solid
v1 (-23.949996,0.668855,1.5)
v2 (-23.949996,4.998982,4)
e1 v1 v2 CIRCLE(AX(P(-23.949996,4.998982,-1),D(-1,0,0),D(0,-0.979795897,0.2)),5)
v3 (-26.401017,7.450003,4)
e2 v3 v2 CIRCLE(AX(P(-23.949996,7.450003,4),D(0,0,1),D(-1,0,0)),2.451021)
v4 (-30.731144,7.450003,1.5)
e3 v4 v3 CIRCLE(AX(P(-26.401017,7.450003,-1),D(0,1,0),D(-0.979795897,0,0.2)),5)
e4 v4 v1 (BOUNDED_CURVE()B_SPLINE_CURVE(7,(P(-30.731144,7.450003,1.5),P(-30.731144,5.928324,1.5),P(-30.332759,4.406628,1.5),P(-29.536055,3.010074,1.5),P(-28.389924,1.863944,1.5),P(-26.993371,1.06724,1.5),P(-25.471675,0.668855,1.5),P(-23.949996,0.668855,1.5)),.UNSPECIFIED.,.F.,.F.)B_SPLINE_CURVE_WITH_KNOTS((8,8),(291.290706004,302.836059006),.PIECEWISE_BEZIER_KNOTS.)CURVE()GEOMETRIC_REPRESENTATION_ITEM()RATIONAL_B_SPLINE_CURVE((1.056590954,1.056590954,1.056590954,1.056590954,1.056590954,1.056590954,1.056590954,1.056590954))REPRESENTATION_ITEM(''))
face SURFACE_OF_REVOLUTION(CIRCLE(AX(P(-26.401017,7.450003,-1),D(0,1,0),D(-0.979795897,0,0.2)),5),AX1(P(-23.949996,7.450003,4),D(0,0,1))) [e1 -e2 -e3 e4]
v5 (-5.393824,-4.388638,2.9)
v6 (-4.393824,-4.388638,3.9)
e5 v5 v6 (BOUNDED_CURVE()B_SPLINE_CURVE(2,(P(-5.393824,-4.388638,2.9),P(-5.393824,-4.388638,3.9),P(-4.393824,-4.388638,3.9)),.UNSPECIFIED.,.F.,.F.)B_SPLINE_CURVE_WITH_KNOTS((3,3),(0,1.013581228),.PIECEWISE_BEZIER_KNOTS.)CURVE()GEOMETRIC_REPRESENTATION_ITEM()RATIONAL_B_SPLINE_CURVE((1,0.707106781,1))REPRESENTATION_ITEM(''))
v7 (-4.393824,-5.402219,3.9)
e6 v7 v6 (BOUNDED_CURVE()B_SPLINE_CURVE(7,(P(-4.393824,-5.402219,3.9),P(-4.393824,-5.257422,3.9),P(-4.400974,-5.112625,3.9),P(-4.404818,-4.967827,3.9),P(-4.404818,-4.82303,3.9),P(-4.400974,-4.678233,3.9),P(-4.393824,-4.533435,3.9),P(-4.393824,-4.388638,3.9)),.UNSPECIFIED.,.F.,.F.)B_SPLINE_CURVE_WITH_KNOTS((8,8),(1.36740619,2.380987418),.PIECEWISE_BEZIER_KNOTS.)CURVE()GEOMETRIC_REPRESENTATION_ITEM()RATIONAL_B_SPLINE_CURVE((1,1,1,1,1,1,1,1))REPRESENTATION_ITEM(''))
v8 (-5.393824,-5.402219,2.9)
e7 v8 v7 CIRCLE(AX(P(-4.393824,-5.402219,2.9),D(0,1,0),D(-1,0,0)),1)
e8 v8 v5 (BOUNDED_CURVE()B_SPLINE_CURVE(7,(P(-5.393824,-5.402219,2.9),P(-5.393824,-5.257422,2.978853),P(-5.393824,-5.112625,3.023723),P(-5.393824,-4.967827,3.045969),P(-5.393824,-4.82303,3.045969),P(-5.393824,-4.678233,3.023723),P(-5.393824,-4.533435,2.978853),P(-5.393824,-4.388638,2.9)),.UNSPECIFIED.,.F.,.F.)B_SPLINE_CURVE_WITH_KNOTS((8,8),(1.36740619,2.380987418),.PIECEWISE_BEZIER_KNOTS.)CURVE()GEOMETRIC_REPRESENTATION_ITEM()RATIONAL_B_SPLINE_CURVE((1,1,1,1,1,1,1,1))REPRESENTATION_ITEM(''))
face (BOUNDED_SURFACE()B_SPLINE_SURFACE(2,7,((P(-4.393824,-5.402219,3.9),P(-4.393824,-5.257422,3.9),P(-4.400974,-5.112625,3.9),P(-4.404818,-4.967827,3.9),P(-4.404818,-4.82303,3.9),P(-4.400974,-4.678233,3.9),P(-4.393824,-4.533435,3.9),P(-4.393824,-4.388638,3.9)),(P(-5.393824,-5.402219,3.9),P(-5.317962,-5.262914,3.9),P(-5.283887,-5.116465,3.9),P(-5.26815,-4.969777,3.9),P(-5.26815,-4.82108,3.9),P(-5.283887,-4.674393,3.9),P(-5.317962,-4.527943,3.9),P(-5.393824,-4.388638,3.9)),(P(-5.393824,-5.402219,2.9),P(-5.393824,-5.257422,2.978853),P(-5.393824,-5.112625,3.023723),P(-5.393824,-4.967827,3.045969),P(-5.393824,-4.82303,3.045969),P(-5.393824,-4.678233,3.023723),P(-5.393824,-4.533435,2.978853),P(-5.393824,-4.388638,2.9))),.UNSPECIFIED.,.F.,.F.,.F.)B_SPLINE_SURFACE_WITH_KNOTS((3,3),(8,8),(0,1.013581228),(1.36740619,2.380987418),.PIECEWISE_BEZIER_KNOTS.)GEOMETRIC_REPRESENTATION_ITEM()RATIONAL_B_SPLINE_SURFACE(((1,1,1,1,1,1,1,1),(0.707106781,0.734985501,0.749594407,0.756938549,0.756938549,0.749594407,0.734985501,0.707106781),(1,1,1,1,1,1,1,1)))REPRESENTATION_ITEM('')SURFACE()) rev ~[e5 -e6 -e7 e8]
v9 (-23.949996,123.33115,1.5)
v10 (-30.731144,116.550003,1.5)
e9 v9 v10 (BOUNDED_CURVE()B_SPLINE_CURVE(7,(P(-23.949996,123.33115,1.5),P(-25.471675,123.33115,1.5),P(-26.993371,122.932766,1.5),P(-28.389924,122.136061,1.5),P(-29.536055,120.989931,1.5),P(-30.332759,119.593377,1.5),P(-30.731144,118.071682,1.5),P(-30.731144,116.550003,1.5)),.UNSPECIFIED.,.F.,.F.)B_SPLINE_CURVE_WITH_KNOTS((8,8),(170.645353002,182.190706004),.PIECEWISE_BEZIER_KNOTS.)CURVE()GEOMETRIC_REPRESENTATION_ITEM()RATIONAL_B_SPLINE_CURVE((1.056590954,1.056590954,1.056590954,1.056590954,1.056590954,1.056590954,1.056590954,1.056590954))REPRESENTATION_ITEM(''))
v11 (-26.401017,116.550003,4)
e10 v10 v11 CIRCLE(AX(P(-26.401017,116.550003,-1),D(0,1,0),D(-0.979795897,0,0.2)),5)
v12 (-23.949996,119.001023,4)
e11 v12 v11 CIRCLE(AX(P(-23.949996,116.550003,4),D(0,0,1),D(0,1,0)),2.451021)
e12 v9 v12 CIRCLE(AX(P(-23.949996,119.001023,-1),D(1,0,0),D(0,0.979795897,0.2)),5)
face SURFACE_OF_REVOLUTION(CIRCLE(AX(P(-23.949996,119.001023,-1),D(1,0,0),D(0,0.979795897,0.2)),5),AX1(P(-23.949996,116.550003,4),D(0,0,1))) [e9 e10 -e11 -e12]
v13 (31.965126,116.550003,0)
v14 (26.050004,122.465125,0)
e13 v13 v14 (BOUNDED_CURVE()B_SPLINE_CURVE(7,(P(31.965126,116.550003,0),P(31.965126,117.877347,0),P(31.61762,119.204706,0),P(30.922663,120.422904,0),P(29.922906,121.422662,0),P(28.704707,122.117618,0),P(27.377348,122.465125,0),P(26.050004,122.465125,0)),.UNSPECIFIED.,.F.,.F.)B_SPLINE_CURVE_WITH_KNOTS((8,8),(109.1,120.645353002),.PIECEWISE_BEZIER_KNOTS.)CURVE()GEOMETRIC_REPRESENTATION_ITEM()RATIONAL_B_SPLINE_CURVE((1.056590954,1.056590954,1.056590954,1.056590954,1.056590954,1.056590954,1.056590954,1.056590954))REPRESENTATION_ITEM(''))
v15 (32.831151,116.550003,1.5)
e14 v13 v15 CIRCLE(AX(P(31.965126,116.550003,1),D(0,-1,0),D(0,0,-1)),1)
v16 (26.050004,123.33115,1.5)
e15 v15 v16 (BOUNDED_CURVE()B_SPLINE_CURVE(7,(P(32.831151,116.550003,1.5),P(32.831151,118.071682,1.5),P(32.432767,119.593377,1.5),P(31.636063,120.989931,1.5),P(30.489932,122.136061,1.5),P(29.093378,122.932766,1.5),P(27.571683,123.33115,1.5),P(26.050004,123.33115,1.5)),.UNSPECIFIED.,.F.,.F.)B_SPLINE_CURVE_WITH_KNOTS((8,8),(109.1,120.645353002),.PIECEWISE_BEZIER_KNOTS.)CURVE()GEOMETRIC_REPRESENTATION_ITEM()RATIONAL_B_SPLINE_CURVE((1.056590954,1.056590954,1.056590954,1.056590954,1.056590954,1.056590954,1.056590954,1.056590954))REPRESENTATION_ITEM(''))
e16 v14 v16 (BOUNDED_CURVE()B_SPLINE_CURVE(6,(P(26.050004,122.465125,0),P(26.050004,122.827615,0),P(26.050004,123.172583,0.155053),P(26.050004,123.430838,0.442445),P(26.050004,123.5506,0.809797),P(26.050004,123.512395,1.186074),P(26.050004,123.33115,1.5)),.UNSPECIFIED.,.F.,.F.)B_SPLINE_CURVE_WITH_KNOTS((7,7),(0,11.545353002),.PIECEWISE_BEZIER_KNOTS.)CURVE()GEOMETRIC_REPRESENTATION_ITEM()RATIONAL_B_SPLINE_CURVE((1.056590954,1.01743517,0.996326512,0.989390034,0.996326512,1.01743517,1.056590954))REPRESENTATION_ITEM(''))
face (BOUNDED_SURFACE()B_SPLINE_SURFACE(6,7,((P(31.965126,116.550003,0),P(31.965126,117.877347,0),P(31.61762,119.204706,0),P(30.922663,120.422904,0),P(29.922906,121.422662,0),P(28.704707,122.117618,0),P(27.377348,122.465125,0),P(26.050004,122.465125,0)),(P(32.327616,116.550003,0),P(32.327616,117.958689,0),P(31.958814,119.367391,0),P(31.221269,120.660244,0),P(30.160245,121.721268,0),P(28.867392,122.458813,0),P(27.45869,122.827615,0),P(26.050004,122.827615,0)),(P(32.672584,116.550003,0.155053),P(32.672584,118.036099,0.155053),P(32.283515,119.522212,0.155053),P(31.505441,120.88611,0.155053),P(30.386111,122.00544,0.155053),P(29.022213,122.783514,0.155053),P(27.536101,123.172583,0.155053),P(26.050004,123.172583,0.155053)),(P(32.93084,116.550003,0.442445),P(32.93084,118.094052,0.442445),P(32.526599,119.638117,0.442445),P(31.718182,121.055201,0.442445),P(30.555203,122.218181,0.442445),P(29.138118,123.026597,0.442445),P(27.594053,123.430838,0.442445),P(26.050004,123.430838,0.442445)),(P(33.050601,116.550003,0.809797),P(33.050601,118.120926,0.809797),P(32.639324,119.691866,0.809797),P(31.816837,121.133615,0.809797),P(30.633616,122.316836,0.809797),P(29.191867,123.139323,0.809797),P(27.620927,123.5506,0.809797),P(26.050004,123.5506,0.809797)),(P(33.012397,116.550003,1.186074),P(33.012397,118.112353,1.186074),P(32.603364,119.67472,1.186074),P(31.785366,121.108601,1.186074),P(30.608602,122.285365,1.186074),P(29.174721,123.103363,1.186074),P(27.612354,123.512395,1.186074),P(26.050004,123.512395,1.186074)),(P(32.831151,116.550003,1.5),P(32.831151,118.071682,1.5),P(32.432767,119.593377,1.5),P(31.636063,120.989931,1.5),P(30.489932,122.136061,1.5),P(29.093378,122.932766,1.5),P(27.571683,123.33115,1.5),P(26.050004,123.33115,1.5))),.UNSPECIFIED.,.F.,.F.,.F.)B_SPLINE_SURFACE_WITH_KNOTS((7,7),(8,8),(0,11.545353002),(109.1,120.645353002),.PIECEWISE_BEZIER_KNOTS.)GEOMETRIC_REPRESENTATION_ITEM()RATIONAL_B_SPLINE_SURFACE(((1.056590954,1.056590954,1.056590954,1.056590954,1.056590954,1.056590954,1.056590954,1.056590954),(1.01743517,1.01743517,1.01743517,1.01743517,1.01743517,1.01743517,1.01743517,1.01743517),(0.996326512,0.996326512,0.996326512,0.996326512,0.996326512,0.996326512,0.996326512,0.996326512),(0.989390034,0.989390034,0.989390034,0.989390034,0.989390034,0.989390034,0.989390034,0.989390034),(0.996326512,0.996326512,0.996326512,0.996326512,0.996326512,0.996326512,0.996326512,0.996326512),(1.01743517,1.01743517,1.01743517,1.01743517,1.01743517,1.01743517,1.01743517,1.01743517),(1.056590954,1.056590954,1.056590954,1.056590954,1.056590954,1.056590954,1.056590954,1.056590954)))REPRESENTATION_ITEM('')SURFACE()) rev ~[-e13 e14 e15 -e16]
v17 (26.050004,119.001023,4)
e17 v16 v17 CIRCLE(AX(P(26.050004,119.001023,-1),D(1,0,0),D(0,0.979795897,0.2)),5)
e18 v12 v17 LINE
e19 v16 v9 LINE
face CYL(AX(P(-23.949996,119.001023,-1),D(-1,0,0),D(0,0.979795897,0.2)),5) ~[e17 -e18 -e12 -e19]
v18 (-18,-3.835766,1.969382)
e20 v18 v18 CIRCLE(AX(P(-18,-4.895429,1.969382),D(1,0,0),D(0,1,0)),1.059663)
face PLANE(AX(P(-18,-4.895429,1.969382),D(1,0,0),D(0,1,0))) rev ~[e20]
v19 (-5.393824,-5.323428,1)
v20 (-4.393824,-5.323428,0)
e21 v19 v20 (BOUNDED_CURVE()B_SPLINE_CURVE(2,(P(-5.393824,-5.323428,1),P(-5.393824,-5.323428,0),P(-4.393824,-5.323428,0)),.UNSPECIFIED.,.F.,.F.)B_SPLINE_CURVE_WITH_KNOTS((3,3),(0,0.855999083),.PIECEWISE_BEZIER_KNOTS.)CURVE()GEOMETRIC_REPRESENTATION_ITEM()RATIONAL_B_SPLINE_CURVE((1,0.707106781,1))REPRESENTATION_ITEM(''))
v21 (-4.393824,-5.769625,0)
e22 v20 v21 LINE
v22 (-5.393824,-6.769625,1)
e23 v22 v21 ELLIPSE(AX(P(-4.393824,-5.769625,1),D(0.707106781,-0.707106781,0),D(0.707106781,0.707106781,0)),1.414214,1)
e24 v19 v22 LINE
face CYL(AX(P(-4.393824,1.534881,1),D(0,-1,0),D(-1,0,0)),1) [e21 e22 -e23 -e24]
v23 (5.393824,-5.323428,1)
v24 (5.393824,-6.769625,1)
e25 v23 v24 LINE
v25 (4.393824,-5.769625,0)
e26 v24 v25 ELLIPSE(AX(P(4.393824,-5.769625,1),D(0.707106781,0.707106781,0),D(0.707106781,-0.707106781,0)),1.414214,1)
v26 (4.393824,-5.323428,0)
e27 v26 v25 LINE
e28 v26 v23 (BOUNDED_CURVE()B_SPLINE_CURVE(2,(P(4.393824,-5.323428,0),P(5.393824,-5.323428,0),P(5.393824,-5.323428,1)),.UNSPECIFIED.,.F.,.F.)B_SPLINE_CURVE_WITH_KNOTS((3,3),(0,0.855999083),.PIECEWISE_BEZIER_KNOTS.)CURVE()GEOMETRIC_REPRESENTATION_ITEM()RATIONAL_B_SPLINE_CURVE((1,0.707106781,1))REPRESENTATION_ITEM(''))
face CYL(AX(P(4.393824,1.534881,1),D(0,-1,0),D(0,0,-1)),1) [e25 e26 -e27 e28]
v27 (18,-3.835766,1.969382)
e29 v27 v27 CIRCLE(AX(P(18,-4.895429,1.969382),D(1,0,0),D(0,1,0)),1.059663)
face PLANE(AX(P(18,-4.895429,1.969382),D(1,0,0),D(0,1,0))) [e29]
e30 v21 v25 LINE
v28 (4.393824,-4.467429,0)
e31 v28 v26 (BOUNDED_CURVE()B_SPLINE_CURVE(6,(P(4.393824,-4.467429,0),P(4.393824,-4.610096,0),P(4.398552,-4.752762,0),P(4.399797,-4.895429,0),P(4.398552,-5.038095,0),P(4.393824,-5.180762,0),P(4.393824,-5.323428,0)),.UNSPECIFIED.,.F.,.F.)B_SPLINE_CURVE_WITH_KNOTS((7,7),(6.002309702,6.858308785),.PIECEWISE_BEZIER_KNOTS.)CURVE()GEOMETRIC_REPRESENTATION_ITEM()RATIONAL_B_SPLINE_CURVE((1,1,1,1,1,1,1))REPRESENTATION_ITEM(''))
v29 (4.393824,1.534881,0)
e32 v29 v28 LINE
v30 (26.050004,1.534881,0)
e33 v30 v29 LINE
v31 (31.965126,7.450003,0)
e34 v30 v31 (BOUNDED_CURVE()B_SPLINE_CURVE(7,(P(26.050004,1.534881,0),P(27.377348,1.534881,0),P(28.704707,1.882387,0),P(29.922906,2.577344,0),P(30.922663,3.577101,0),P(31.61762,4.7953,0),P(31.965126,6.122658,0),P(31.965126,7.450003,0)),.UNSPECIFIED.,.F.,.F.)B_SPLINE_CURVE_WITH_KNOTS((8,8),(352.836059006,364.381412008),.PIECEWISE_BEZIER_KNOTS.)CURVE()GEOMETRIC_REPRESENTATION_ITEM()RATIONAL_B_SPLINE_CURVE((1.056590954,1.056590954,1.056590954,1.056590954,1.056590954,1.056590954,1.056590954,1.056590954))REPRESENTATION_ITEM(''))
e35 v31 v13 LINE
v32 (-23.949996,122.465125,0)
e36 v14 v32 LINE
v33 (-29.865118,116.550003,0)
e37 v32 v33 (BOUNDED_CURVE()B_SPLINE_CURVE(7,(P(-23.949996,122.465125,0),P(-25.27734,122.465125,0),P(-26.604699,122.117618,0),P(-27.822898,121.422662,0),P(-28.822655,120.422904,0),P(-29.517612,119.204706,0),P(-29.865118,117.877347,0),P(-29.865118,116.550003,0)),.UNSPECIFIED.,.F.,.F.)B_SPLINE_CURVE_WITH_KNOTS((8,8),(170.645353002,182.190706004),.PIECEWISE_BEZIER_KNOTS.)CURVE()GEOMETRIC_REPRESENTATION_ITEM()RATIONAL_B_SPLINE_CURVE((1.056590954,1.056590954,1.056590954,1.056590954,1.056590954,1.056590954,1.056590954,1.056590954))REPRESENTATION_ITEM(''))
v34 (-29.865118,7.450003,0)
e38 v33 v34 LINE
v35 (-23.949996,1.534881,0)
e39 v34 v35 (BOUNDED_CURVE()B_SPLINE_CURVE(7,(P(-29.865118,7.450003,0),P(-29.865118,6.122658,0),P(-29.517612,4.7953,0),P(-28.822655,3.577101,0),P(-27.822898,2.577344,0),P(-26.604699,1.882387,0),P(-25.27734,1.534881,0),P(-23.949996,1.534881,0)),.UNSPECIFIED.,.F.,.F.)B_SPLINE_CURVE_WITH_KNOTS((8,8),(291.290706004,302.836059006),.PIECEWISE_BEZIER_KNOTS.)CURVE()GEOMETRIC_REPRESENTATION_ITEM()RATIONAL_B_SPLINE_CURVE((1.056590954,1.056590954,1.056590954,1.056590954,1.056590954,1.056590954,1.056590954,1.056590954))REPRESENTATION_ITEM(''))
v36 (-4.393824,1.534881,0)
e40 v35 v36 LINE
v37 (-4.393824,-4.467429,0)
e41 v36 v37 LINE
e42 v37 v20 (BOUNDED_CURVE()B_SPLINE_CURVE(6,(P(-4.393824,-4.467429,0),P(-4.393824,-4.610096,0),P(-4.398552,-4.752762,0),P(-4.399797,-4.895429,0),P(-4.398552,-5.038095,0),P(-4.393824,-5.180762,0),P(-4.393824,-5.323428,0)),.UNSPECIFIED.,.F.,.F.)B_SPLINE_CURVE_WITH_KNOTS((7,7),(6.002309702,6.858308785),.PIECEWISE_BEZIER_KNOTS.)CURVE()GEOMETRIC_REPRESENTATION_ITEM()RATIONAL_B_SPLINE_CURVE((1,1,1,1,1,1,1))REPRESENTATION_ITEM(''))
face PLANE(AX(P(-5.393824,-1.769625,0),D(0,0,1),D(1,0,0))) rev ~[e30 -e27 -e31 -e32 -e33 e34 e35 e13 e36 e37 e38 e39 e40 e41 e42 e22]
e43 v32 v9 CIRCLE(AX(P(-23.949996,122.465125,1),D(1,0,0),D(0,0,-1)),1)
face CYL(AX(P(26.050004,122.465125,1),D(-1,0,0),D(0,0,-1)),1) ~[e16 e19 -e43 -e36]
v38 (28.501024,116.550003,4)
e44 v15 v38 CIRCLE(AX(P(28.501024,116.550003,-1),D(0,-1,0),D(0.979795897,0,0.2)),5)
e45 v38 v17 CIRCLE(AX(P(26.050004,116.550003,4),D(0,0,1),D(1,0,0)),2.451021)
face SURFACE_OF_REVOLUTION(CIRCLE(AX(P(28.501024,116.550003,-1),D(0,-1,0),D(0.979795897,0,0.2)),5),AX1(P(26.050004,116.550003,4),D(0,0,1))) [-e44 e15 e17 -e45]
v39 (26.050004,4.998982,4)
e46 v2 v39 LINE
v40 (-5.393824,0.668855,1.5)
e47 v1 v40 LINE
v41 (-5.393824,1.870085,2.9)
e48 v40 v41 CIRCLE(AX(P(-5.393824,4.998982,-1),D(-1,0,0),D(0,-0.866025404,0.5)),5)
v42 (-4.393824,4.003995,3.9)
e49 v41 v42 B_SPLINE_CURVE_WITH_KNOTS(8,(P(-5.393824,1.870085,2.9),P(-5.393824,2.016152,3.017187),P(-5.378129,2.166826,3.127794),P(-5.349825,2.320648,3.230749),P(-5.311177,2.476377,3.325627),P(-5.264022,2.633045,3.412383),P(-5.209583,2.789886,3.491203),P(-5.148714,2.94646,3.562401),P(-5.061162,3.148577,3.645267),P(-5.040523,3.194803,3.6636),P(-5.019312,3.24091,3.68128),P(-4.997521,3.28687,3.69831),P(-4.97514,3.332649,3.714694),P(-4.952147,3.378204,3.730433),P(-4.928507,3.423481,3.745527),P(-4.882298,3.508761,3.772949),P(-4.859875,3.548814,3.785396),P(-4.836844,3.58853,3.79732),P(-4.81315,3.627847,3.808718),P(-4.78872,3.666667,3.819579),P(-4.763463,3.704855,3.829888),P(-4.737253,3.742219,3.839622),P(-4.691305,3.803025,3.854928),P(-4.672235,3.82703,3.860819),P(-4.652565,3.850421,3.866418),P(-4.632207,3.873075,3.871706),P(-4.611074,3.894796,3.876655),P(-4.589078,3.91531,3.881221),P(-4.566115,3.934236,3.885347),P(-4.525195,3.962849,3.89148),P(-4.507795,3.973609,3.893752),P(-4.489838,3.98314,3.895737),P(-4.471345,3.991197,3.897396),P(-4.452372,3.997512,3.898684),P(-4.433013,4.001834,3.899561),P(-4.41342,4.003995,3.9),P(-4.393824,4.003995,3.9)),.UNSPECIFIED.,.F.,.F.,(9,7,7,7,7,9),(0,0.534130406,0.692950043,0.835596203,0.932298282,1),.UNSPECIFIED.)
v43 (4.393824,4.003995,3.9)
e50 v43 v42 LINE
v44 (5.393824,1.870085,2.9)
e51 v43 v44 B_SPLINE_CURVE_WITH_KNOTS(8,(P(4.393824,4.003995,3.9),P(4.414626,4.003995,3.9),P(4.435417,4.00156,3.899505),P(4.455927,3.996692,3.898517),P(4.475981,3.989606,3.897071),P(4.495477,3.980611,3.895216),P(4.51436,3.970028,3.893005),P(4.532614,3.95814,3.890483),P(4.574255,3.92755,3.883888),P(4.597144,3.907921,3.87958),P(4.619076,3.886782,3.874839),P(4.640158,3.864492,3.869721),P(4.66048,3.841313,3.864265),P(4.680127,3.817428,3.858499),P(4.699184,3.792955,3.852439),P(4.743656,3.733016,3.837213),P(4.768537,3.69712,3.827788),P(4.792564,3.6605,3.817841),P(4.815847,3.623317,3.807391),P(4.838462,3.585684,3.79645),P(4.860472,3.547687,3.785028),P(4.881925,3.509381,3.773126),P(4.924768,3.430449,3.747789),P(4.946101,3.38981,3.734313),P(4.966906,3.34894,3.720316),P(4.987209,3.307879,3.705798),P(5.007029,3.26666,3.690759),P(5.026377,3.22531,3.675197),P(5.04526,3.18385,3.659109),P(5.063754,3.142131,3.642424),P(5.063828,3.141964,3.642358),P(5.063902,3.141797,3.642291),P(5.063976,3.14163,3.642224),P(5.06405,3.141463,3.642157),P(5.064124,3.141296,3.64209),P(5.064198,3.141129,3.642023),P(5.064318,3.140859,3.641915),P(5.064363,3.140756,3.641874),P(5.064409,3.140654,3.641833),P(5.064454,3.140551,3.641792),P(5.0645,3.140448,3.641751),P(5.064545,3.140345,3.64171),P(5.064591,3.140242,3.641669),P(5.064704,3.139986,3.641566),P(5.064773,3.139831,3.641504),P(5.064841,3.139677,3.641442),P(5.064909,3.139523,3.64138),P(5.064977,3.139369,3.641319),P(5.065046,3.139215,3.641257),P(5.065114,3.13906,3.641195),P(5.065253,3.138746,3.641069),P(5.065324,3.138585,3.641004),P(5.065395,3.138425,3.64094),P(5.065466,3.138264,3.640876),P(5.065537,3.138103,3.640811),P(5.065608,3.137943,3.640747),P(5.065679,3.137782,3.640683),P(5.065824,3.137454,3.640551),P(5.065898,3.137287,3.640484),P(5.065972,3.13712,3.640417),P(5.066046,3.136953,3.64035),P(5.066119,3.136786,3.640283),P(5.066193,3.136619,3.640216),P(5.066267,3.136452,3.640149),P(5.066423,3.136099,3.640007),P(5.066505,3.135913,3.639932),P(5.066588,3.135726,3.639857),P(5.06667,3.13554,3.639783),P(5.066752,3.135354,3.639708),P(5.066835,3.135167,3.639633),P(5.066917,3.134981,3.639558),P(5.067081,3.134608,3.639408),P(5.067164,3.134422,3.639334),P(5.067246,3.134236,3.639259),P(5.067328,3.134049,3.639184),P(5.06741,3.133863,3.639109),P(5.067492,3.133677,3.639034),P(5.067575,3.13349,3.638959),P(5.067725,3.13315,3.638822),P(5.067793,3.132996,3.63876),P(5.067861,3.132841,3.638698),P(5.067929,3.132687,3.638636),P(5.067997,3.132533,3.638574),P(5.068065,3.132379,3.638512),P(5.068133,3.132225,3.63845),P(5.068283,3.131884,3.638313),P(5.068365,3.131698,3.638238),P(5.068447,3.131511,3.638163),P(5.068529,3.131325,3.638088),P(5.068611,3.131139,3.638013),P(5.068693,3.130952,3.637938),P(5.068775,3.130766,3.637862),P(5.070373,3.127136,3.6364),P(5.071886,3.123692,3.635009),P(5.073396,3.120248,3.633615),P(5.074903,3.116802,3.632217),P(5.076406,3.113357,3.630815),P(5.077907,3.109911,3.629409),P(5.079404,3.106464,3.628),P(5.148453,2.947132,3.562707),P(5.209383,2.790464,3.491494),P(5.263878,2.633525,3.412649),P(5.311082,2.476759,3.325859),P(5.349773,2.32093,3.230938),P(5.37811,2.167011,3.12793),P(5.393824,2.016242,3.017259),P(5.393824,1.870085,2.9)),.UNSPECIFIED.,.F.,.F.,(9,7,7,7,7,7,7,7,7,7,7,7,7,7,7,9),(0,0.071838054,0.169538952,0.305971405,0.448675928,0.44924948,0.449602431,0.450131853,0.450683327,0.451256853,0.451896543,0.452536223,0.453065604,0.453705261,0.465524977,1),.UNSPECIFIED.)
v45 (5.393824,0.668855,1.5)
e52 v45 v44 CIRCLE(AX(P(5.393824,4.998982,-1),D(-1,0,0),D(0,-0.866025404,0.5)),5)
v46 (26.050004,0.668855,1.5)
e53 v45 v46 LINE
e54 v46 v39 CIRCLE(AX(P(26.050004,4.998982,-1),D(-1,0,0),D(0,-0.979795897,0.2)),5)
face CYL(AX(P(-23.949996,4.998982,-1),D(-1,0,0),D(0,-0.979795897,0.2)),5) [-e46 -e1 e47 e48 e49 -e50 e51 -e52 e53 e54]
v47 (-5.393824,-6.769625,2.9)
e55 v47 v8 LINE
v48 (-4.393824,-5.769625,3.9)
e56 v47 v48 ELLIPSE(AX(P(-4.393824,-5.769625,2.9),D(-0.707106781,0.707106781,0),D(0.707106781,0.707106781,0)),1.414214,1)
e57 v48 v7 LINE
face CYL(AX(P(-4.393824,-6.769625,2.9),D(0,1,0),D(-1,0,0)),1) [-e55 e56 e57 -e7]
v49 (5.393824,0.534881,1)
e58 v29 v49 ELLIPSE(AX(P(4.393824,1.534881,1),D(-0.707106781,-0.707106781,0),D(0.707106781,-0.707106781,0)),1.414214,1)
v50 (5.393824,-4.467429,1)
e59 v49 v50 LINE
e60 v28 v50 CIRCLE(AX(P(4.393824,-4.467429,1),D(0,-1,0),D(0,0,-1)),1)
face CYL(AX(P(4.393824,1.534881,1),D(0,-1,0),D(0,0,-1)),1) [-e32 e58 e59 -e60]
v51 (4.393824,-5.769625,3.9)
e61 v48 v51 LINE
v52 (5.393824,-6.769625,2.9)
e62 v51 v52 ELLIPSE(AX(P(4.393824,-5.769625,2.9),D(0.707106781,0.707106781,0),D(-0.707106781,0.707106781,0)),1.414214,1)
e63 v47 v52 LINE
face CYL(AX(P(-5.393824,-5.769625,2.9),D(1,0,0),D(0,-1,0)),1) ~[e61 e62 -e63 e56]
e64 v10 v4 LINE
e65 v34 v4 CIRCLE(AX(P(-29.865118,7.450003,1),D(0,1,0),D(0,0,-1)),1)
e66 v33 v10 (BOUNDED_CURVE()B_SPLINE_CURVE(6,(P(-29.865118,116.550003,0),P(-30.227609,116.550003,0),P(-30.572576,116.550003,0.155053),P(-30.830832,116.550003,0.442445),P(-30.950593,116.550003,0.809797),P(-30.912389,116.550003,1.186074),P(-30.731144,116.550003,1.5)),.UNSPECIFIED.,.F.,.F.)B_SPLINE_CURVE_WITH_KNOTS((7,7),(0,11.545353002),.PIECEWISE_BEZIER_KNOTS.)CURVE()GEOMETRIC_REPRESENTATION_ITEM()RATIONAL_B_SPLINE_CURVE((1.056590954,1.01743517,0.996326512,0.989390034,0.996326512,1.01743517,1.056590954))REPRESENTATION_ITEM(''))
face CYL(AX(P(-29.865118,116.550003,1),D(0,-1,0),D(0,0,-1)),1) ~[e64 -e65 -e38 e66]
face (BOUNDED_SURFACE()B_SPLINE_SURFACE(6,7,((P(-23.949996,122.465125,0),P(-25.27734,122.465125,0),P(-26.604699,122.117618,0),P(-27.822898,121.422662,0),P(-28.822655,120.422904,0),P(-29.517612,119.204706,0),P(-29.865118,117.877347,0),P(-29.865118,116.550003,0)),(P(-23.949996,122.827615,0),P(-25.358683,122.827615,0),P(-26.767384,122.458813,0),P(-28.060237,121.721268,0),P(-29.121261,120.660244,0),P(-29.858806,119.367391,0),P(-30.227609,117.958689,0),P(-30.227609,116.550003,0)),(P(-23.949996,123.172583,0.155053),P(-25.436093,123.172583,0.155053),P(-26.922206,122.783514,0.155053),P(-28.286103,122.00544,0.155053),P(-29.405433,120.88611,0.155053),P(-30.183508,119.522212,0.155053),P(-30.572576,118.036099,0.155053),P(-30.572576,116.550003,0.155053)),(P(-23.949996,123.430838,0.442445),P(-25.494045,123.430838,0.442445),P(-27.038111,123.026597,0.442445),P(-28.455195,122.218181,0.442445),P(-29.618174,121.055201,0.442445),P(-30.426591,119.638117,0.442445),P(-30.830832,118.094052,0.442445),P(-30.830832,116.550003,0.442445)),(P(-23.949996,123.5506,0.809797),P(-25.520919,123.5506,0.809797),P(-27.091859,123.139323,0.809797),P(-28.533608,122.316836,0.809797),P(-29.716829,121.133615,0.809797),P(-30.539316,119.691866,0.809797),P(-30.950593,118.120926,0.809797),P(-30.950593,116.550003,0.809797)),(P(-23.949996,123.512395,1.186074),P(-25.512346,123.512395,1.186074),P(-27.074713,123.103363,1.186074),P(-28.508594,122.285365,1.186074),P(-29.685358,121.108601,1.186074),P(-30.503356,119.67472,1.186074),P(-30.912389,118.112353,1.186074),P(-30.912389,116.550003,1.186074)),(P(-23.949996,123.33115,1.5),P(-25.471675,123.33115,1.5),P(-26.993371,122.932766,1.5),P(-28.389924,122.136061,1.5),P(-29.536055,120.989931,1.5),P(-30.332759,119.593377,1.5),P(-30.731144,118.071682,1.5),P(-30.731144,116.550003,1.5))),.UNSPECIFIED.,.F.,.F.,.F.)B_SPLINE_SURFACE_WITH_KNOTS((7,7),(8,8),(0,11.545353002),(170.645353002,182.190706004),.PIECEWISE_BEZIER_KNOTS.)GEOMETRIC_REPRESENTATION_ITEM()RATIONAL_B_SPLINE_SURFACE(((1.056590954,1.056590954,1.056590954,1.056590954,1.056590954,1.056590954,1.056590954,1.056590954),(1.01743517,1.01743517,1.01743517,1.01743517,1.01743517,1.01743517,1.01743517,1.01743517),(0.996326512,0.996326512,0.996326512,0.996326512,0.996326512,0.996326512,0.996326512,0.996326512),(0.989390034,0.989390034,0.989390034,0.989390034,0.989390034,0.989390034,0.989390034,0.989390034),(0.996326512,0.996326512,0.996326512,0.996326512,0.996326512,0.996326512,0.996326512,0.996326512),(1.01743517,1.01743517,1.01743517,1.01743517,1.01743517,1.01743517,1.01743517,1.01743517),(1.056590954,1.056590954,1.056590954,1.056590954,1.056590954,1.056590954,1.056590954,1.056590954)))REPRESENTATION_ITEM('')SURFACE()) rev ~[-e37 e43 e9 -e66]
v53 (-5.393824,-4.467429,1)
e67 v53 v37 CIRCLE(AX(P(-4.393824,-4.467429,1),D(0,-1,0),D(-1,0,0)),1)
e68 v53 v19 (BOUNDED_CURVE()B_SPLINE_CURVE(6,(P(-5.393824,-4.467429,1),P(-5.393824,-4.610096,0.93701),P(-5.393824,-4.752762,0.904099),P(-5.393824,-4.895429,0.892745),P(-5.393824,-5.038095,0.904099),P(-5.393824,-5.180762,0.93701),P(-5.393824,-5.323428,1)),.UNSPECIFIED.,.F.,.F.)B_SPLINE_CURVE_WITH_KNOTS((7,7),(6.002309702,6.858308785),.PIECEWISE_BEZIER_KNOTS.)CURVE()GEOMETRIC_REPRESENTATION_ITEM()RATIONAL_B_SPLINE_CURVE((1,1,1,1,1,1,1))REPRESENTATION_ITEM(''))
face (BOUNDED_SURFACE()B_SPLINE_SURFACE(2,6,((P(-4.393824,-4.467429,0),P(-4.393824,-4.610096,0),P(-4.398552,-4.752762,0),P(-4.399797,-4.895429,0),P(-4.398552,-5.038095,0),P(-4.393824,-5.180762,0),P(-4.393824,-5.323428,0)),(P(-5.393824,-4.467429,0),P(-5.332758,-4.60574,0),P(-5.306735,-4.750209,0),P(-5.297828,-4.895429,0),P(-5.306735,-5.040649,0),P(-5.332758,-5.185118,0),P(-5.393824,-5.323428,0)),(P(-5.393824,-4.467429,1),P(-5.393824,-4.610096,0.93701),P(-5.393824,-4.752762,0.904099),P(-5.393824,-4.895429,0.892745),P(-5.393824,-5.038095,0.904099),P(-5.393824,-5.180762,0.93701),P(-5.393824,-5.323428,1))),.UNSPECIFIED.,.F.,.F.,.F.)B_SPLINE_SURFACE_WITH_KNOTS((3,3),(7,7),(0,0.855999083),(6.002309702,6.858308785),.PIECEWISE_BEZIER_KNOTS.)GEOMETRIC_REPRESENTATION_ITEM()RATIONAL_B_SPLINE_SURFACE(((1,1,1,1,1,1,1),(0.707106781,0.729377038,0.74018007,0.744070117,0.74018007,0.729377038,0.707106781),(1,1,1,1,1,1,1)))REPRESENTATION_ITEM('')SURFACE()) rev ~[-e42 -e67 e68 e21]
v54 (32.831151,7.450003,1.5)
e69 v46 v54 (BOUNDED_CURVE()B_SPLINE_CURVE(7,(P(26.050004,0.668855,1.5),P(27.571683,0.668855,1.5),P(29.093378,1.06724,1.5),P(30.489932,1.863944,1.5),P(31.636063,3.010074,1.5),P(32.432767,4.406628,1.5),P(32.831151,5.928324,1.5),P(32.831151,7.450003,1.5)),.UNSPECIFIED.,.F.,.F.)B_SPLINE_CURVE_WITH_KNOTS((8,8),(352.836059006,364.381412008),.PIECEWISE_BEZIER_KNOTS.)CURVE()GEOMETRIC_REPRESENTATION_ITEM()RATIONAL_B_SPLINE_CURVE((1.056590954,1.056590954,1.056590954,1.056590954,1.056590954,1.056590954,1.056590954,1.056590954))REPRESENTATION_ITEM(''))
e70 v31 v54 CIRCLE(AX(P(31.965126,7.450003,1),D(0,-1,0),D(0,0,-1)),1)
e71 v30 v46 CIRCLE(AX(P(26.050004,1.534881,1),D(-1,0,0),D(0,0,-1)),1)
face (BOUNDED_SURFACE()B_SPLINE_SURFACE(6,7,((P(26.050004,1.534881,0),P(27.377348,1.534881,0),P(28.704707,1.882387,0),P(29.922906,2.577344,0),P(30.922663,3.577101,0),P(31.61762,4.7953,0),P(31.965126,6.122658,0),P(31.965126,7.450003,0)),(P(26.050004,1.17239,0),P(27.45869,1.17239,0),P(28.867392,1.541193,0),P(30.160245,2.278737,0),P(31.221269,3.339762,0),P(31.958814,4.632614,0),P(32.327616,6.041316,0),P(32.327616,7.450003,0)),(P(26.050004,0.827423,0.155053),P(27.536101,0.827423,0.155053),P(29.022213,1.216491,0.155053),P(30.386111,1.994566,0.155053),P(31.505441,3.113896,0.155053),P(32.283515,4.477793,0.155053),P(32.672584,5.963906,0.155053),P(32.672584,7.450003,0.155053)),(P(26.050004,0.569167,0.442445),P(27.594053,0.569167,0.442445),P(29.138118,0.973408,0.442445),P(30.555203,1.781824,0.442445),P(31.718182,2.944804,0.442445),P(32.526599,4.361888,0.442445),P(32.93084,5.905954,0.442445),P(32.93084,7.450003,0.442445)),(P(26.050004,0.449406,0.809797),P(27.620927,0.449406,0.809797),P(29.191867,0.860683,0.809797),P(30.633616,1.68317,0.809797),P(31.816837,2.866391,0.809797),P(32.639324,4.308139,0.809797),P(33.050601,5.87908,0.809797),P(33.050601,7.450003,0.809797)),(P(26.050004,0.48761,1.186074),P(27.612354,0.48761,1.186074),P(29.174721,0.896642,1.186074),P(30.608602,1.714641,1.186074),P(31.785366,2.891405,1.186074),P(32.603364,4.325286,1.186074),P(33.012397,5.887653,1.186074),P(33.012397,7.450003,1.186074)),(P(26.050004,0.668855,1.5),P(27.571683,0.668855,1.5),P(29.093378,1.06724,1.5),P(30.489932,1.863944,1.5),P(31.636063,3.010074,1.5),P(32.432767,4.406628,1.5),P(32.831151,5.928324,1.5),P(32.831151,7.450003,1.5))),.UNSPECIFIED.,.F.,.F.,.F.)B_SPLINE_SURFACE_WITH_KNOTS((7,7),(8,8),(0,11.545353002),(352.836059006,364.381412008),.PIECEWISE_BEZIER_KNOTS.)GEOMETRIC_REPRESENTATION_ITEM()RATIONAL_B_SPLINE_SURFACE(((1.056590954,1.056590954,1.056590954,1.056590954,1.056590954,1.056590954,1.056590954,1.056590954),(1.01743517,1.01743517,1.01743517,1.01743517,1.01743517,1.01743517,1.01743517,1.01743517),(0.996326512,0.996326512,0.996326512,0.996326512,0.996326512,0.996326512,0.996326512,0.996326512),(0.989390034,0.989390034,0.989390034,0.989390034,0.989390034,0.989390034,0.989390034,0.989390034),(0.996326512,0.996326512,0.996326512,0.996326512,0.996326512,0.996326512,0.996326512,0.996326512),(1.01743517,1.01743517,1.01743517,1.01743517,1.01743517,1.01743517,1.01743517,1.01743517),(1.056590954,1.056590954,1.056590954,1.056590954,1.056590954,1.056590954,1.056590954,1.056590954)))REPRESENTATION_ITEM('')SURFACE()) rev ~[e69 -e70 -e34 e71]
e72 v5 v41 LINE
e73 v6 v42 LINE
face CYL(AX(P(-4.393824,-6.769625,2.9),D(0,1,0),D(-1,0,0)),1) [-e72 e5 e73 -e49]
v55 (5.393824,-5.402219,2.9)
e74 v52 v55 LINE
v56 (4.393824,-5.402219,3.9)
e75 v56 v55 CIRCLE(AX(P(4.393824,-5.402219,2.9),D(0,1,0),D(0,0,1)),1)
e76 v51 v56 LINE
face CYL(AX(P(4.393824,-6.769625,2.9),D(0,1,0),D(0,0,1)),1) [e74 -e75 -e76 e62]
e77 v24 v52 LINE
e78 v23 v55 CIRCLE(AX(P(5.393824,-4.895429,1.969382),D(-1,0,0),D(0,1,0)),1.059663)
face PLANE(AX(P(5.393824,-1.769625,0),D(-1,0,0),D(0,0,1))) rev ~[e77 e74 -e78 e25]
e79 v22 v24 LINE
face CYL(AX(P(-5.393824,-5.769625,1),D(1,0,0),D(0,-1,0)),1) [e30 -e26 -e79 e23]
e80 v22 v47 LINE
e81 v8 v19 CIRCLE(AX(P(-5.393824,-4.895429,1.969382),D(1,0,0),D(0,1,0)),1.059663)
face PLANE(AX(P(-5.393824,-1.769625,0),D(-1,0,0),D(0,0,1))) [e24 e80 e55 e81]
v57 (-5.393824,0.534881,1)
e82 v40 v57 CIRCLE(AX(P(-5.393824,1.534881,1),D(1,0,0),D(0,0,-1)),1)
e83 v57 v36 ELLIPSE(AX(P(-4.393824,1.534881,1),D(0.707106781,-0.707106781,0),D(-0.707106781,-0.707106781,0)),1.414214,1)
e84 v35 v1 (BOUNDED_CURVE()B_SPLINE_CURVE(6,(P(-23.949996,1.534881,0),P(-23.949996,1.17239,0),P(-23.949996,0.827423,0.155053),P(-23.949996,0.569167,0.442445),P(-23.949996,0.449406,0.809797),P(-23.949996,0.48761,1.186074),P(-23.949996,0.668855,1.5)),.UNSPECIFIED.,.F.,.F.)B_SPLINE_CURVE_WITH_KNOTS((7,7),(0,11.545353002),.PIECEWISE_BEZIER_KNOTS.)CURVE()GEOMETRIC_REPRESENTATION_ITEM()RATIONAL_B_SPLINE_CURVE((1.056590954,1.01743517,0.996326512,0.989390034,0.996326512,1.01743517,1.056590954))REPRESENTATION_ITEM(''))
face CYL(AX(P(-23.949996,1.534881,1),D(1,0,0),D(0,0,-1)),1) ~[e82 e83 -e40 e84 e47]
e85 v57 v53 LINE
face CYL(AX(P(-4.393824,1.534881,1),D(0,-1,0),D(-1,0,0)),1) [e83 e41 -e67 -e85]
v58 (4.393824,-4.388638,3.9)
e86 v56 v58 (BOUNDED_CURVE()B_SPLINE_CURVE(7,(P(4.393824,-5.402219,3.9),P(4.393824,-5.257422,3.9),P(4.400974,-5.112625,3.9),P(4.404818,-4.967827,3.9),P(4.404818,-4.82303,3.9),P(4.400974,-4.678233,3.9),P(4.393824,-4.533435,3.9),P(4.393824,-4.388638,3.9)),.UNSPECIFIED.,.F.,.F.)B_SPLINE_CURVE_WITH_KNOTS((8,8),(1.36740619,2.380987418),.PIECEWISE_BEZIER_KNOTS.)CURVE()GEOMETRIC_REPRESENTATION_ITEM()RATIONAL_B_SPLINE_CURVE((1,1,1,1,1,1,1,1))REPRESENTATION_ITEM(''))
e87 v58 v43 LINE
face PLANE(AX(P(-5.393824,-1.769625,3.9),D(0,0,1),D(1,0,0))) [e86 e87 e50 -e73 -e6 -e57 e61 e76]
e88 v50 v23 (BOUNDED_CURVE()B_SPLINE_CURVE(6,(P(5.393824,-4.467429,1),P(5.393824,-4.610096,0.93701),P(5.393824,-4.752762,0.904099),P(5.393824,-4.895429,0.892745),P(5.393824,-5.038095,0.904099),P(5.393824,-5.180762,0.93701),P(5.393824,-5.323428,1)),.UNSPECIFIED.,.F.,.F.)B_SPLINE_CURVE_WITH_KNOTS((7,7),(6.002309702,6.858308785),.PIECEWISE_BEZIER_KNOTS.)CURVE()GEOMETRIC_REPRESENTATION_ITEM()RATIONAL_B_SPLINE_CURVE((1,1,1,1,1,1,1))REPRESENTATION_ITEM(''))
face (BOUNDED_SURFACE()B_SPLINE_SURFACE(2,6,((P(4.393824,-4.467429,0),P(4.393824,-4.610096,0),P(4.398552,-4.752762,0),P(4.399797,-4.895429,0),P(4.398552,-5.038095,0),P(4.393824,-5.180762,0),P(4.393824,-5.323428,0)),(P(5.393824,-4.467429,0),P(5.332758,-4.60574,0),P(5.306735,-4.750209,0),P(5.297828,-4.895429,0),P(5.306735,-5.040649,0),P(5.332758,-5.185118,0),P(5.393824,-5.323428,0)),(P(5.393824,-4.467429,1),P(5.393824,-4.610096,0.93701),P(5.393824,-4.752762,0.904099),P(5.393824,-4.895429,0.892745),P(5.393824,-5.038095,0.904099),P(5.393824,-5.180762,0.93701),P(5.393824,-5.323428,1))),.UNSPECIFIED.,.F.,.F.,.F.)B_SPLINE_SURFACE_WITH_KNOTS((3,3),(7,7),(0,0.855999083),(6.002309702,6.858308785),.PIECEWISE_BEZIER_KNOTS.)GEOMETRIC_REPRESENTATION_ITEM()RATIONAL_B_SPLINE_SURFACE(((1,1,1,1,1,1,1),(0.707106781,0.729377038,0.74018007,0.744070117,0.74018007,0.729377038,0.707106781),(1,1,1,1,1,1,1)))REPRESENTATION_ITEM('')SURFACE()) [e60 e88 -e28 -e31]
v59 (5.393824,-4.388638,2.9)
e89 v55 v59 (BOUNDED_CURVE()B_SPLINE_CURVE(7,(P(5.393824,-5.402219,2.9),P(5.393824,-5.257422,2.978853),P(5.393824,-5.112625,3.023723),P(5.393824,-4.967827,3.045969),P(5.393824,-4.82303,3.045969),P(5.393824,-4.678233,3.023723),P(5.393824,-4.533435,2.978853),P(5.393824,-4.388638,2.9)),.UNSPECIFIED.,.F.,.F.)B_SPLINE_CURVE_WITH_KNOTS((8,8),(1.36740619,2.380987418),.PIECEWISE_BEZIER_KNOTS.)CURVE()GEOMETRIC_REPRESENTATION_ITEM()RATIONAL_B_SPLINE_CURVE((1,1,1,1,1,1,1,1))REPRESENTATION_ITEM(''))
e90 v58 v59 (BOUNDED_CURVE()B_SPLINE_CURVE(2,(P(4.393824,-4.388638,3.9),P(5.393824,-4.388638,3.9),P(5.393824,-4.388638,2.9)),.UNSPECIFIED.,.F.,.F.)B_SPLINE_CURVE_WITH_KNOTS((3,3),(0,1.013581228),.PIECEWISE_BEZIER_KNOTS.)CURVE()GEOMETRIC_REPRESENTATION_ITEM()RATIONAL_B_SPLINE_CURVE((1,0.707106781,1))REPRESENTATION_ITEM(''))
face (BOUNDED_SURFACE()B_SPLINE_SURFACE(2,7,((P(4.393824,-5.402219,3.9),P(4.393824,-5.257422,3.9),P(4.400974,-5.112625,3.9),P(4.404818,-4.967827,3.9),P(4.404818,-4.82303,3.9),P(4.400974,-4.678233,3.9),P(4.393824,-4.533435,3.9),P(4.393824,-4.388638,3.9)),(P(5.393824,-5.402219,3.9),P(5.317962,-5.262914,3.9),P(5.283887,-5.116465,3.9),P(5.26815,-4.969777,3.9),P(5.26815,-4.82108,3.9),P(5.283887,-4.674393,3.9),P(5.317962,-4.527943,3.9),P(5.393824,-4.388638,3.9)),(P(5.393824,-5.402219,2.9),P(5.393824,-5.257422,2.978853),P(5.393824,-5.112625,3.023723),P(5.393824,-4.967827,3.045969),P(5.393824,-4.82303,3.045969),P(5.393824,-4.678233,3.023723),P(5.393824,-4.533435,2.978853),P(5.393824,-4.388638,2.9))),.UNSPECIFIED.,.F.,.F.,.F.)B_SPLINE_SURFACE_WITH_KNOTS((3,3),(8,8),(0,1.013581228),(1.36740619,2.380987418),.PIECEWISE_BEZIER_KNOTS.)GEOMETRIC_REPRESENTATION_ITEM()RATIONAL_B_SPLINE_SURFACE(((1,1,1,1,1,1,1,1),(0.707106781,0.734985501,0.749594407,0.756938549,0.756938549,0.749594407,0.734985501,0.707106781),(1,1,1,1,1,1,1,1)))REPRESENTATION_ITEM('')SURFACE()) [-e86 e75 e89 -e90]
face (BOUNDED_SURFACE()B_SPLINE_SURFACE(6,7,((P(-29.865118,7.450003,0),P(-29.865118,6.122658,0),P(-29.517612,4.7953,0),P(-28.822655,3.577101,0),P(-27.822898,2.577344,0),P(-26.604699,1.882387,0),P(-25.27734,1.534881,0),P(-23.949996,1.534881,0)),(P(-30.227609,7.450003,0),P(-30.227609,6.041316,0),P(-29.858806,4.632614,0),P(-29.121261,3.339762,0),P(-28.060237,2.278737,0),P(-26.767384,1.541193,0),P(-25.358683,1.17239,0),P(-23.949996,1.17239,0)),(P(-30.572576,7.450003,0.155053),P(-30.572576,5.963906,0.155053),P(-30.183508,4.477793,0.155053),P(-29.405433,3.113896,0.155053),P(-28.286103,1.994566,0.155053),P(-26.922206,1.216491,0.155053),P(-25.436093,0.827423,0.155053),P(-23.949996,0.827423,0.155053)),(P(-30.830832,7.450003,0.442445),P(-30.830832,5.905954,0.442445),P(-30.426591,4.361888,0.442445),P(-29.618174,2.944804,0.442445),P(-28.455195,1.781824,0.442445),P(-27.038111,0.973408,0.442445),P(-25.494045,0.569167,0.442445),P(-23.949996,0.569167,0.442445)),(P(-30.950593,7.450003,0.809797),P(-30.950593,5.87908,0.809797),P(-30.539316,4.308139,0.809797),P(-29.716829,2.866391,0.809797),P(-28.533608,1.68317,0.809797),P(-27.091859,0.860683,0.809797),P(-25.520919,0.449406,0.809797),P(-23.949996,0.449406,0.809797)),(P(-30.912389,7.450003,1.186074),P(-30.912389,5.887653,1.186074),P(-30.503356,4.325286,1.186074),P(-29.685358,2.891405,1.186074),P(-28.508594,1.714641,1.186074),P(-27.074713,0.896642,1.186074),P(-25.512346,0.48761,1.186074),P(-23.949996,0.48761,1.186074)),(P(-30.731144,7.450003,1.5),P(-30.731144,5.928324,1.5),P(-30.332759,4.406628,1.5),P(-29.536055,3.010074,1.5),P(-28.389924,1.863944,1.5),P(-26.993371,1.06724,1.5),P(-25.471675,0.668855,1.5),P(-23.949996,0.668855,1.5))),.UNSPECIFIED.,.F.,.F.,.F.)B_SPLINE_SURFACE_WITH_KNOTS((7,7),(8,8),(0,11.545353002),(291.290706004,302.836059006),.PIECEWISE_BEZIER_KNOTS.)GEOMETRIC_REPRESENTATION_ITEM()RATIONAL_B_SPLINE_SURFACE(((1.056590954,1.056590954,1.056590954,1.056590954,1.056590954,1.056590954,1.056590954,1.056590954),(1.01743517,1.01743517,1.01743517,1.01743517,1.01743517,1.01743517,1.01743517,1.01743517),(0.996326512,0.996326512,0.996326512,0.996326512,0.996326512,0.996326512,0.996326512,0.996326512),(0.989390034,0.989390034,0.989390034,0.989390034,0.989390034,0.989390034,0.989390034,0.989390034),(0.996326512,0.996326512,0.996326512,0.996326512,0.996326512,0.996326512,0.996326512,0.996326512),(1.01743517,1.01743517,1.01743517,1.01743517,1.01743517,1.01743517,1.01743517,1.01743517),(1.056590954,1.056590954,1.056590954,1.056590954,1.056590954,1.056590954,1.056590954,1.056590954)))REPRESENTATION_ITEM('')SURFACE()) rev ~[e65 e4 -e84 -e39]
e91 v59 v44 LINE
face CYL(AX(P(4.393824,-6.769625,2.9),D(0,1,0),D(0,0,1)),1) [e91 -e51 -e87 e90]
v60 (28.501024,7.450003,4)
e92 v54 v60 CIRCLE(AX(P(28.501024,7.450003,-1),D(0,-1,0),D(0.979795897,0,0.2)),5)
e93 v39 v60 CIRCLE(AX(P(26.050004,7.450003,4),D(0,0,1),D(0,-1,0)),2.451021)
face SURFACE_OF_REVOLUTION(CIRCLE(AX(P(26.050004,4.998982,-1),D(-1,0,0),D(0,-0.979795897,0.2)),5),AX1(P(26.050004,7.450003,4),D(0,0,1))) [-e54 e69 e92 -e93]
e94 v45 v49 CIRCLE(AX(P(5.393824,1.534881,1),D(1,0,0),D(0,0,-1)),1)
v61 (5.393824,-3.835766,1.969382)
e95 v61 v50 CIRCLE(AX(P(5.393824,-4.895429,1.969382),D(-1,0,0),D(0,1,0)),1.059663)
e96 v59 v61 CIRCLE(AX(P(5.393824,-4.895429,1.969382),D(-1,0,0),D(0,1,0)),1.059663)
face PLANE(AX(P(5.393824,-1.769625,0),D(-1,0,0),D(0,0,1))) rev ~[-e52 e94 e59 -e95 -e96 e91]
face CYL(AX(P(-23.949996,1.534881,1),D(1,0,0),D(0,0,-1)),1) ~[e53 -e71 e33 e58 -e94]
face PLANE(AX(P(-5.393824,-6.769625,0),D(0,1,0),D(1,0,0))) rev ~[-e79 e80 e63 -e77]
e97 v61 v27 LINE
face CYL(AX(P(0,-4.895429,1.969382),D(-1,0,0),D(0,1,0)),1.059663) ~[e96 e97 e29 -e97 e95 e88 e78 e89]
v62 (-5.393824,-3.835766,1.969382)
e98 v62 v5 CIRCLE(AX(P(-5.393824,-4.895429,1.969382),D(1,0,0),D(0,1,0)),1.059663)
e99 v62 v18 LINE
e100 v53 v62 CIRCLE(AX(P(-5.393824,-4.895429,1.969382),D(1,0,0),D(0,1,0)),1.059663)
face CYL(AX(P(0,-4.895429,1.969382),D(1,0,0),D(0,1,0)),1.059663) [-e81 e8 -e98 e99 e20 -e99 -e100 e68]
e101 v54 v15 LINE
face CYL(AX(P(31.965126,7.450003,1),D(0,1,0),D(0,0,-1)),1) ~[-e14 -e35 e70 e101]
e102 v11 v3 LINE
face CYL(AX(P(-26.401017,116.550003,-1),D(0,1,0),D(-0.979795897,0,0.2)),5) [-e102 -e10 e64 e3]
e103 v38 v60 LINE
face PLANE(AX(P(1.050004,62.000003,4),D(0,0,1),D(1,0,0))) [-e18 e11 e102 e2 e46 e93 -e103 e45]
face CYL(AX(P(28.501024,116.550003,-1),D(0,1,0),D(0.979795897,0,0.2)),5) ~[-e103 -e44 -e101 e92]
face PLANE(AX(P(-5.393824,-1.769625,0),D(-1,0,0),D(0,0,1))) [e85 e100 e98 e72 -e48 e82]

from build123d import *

# Parameters (mm, degrees)
F1_DEPTH     = 4
F2_T1_DEPTH  = 109.1
F2_T3_DEPTH  = 50
F2_T6_ANGLE  = 90
F2_T8_ANGLE  = 90
F2_T10_ANGLE = 90
F2_T12_ANGLE = 90
F3_R         = 1
F4_W         = 10.7876481488
F4_H         = 3.5392509308
F5_DEPTH     = 3.9
F6_DEPTH     = 4.8
F7_DEPTH     = 5
F8_R         = 1.0596630805
F9_DEPTH     = 18
F10_DEPTH    = 18
F11_R        = 1


# Not quite as in the source:
# - a fillet or chamfer that OpenCascade refuses, or shapes differently, is made with other operations: its cross-section is extruded or revolved along the edge and cut away or added


with BuildPart() as f1:
    # F0 (on Top) → F1 (new body)
    with BuildSketch(Plane.XY):
        with BuildLine():
            Line((26.0500038445, 123.900002712), (-23.9499961555, 123.900002712))
            ThreePointArc((-23.9499961555, 123.900002712), (-29.1472309972, 121.7472375537), (-31.2999961555, 116.550002712))
            Line((-31.2999961555, 116.550002712), (-31.2999961555, 7.450002712))
            ThreePointArc((-31.2999961555, 7.450002712), (-29.1472309972, 2.2527678703), (-23.9499961555, 0.100002712))
            Line((-23.9499961555, 0.100002712), (26.0500038445, 0.100002712))
            ThreePointArc((26.0500038445, 0.100002712), (31.2472386862, 2.2527678703), (33.4000038445, 7.450002712))
            Line((33.4000038445, 7.450002712), (33.4000038445, 116.550002712))
            ThreePointArc((33.4000038445, 116.550002712), (31.2472386862, 121.7472375537), (26.0500038445, 123.900002712))
        make_face()
    extrude(amount=F1_DEPTH)

    # F2: fillet of radius 5 on 1 edges, made by hand

    # F2_s2 → F2_t1 (cut)
    with BuildSketch(Plane.XZ.offset(-116.550002712)):
        with BuildLine():
            ThreePointArc((33.4000038445, 0), (31.6633020191, 2.8729833462), (28.5010243589, 4))
            Line((28.5010243589, 4), (28.5010243589, 4.1))
            Line((28.5010243589, 4.1), (33.4000038445, 4.1))
            Line((33.4000038445, 4.1), (33.5000038445, 4))
            ThreePointArc((33.5000038445, 4), (33.5000038445, 2), (33.4979834342, 0.02))
            Line((33.4979834342, 0.02), (33.4000038445, 0))
        make_face()
        with BuildLine():
            ThreePointArc((-31.2999961555, 0), (-29.5632943301, 2.8729833462), (-26.4010166699, 4))
            Line((-26.4010166699, 4), (-26.4010166699, 4.1))
            Line((-26.4010166699, 4.1), (-31.2999961555, 4.1))
            Line((-31.2999961555, 4.1), (-31.3999961555, 4))
            ThreePointArc((-31.3999961555, 4), (-31.3999961555, 2), (-31.3979757452, 0.02))
            Line((-31.3979757452, 0.02), (-31.2999961555, 0))
        make_face()
    extrude(amount=F2_T1_DEPTH, mode=Mode.SUBTRACT)

    # F2_s4 → F2_t3 (cut)
    with BuildSketch(Plane.YZ.offset(-23.9499961555)):
        with BuildLine():
            ThreePointArc((123.900002712, 0), (122.1633008866, 2.8729833462), (119.0010232264, 4))
            Line((119.0010232264, 4), (119.0010232264, 4.1))
            Line((119.0010232264, 4.1), (123.900002712, 4.1))
            Line((123.900002712, 4.1), (124.000002712, 4))
            ThreePointArc((124.000002712, 4), (124.000002712, 2), (123.9979823017, 0.02))
            Line((123.9979823017, 0.02), (123.900002712, 0))
        make_face()
        with BuildLine():
            ThreePointArc((0.100002712, 0), (1.8367045374, 2.8729833462), (4.9989821976, 4))
            Line((4.9989821976, 4), (4.9989821976, 4.1))
            Line((4.9989821976, 4.1), (0.100002712, 4.1))
            Line((0.100002712, 4.1), (2.712e-06, 4))
            ThreePointArc((2.712e-06, 4), (2.712e-06, 2), (0.0020231223, 0.02))
            Line((0.0020231223, 0.02), (0.100002712, 0))
        make_face()
    extrude(amount=F2_T3_DEPTH, mode=Mode.SUBTRACT)

    # F2_s5 → F2_t6 (revolve, cut)
    with BuildSketch(Plane.YZ.offset(26.0500038445)):
        with BuildLine():
            ThreePointArc((0.100002712, 0), (1.8367045374, 2.8729833462), (4.9989821976, 4))
            Line((4.9989821976, 4), (4.9989821976, 4.1))
            Line((4.9989821976, 4.1), (0.100002712, 4.1))
            Line((0.100002712, 4.1), (2.712e-06, 4))
            ThreePointArc((2.712e-06, 4), (2.712e-06, 2), (0.0020231223, 0.02))
            Line((0.0020231223, 0.02), (0.100002712, 0))
        make_face()
    revolve(axis=Axis((26.0500038445, 7.450002712, 4), (0, 0, 1)), revolution_arc=F2_T6_ANGLE, mode=Mode.SUBTRACT)

    # F2_s7 → F2_t8 (revolve, cut)
    with BuildSketch(Plane.XZ.offset(-116.550002712)):
        with BuildLine():
            ThreePointArc((33.4000038445, 0), (31.6633020191, 2.8729833462), (28.5010243589, 4))
            Line((28.5010243589, 4), (28.5010243589, 4.1))
            Line((28.5010243589, 4.1), (33.4000038445, 4.1))
            Line((33.4000038445, 4.1), (33.5000038445, 4))
            ThreePointArc((33.5000038445, 4), (33.5000038445, 2), (33.4979834342, 0.02))
            Line((33.4979834342, 0.02), (33.4000038445, 0))
        make_face()
    revolve(axis=Axis((26.0500038445, 116.550002712, 4), (0, 0, 1)), revolution_arc=F2_T8_ANGLE, mode=Mode.SUBTRACT)

    # F2_s9 → F2_t10 (revolve, cut)
    with BuildSketch(Plane.YZ.offset(-23.9499961555)):
        with BuildLine():
            ThreePointArc((123.900002712, 0), (122.1633008866, 2.8729833462), (119.0010232264, 4))
            Line((119.0010232264, 4), (119.0010232264, 4.1))
            Line((119.0010232264, 4.1), (123.900002712, 4.1))
            Line((123.900002712, 4.1), (124.000002712, 4))
            ThreePointArc((124.000002712, 4), (124.000002712, 2), (123.9979823017, 0.02))
            Line((123.9979823017, 0.02), (123.900002712, 0))
        make_face()
    revolve(axis=Axis((-23.9499961555, 116.550002712, 4), (0, 0, 1)), revolution_arc=F2_T10_ANGLE, mode=Mode.SUBTRACT)

    # F2_s11 → F2_t12 (revolve, cut)
    with BuildSketch(Plane.XZ.offset(-7.450002712)):
        with BuildLine():
            ThreePointArc((-31.2999961555, 0), (-29.5632943301, 2.8729833462), (-26.4010166699, 4))
            Line((-26.4010166699, 4), (-26.4010166699, 4.1))
            Line((-26.4010166699, 4.1), (-31.2999961555, 4.1))
            Line((-31.2999961555, 4.1), (-31.3999961555, 4))
            ThreePointArc((-31.3999961555, 4), (-31.3999961555, 2), (-31.3979757452, 0.02))
            Line((-31.3979757452, 0.02), (-31.2999961555, 0))
        make_face()
    revolve(axis=Axis((-23.9499961555, 7.450002712, 4), (0, 0, 1)), revolution_arc=F2_T12_ANGLE, mode=Mode.SUBTRACT)

    # F3
    f3_edges = [f1.edges().sort_by_distance(p)[0] for p in [
        (33.400004, 62.000003, 0),
        (31.247239, 121.747238, 0),
        (1.050004, 123.900003, 0),
        (-29.147231, 121.747238, 0),
        (-31.299996, 62.000003, 0),
        (-29.147231, 2.252768, 0),
        (1.050004, 0.100003, 0),
        (31.247239, 2.252768, 0),
    ]]
    fillet(f3_edges, radius=F3_R)

    # F4 (on Top) → F5 (join)
    with BuildSketch(Plane.XY):
        Rectangle(F4_W, F4_H)
    extrude(amount=F5_DEPTH)

    # F6 (add): a face of the model
    f6_faces = [f1.faces().sort_by_distance(p)[0] for p in [
        (0, 1.7696254654, 3.3586156696),
    ]]
    extrude(f6_faces, amount=F6_DEPTH)

    # F7 (add): a face of the model
    f7_faces = [f1.faces().sort_by_distance(p)[0] for p in [
        (0, -1.7696254654, 1.95),
    ]]
    extrude(f7_faces, amount=F7_DEPTH)

    # F8 (on Right) → F9 (join)
    with BuildSketch(Plane.YZ):
        with Locations((-4.8954286613, 1.9693823997)):
            Circle(F8_R)
    extrude(amount=F9_DEPTH)

    # F8 (on Right) → F10 (join)
    with BuildSketch(Plane.YZ):
        with Locations((-4.8954286613, 1.9693823997)):
            Circle(F8_R)
    extrude(amount=-F10_DEPTH)

    # F11
    f11_edges = [f1.edges().sort_by_distance(p)[0] for p in [
        (5.393824, -1.382815, 3.9),
        (-5.393824, -1.382815, 3.9),
        (0, -6.769625, 3.9),
        (0, -6.769625, 0),
        (5.393824, -2.617372, 0),
        (-5.393824, -2.617372, 0),
    ]]
    fillet(f11_edges, radius=F11_R)


solid = f1.part
